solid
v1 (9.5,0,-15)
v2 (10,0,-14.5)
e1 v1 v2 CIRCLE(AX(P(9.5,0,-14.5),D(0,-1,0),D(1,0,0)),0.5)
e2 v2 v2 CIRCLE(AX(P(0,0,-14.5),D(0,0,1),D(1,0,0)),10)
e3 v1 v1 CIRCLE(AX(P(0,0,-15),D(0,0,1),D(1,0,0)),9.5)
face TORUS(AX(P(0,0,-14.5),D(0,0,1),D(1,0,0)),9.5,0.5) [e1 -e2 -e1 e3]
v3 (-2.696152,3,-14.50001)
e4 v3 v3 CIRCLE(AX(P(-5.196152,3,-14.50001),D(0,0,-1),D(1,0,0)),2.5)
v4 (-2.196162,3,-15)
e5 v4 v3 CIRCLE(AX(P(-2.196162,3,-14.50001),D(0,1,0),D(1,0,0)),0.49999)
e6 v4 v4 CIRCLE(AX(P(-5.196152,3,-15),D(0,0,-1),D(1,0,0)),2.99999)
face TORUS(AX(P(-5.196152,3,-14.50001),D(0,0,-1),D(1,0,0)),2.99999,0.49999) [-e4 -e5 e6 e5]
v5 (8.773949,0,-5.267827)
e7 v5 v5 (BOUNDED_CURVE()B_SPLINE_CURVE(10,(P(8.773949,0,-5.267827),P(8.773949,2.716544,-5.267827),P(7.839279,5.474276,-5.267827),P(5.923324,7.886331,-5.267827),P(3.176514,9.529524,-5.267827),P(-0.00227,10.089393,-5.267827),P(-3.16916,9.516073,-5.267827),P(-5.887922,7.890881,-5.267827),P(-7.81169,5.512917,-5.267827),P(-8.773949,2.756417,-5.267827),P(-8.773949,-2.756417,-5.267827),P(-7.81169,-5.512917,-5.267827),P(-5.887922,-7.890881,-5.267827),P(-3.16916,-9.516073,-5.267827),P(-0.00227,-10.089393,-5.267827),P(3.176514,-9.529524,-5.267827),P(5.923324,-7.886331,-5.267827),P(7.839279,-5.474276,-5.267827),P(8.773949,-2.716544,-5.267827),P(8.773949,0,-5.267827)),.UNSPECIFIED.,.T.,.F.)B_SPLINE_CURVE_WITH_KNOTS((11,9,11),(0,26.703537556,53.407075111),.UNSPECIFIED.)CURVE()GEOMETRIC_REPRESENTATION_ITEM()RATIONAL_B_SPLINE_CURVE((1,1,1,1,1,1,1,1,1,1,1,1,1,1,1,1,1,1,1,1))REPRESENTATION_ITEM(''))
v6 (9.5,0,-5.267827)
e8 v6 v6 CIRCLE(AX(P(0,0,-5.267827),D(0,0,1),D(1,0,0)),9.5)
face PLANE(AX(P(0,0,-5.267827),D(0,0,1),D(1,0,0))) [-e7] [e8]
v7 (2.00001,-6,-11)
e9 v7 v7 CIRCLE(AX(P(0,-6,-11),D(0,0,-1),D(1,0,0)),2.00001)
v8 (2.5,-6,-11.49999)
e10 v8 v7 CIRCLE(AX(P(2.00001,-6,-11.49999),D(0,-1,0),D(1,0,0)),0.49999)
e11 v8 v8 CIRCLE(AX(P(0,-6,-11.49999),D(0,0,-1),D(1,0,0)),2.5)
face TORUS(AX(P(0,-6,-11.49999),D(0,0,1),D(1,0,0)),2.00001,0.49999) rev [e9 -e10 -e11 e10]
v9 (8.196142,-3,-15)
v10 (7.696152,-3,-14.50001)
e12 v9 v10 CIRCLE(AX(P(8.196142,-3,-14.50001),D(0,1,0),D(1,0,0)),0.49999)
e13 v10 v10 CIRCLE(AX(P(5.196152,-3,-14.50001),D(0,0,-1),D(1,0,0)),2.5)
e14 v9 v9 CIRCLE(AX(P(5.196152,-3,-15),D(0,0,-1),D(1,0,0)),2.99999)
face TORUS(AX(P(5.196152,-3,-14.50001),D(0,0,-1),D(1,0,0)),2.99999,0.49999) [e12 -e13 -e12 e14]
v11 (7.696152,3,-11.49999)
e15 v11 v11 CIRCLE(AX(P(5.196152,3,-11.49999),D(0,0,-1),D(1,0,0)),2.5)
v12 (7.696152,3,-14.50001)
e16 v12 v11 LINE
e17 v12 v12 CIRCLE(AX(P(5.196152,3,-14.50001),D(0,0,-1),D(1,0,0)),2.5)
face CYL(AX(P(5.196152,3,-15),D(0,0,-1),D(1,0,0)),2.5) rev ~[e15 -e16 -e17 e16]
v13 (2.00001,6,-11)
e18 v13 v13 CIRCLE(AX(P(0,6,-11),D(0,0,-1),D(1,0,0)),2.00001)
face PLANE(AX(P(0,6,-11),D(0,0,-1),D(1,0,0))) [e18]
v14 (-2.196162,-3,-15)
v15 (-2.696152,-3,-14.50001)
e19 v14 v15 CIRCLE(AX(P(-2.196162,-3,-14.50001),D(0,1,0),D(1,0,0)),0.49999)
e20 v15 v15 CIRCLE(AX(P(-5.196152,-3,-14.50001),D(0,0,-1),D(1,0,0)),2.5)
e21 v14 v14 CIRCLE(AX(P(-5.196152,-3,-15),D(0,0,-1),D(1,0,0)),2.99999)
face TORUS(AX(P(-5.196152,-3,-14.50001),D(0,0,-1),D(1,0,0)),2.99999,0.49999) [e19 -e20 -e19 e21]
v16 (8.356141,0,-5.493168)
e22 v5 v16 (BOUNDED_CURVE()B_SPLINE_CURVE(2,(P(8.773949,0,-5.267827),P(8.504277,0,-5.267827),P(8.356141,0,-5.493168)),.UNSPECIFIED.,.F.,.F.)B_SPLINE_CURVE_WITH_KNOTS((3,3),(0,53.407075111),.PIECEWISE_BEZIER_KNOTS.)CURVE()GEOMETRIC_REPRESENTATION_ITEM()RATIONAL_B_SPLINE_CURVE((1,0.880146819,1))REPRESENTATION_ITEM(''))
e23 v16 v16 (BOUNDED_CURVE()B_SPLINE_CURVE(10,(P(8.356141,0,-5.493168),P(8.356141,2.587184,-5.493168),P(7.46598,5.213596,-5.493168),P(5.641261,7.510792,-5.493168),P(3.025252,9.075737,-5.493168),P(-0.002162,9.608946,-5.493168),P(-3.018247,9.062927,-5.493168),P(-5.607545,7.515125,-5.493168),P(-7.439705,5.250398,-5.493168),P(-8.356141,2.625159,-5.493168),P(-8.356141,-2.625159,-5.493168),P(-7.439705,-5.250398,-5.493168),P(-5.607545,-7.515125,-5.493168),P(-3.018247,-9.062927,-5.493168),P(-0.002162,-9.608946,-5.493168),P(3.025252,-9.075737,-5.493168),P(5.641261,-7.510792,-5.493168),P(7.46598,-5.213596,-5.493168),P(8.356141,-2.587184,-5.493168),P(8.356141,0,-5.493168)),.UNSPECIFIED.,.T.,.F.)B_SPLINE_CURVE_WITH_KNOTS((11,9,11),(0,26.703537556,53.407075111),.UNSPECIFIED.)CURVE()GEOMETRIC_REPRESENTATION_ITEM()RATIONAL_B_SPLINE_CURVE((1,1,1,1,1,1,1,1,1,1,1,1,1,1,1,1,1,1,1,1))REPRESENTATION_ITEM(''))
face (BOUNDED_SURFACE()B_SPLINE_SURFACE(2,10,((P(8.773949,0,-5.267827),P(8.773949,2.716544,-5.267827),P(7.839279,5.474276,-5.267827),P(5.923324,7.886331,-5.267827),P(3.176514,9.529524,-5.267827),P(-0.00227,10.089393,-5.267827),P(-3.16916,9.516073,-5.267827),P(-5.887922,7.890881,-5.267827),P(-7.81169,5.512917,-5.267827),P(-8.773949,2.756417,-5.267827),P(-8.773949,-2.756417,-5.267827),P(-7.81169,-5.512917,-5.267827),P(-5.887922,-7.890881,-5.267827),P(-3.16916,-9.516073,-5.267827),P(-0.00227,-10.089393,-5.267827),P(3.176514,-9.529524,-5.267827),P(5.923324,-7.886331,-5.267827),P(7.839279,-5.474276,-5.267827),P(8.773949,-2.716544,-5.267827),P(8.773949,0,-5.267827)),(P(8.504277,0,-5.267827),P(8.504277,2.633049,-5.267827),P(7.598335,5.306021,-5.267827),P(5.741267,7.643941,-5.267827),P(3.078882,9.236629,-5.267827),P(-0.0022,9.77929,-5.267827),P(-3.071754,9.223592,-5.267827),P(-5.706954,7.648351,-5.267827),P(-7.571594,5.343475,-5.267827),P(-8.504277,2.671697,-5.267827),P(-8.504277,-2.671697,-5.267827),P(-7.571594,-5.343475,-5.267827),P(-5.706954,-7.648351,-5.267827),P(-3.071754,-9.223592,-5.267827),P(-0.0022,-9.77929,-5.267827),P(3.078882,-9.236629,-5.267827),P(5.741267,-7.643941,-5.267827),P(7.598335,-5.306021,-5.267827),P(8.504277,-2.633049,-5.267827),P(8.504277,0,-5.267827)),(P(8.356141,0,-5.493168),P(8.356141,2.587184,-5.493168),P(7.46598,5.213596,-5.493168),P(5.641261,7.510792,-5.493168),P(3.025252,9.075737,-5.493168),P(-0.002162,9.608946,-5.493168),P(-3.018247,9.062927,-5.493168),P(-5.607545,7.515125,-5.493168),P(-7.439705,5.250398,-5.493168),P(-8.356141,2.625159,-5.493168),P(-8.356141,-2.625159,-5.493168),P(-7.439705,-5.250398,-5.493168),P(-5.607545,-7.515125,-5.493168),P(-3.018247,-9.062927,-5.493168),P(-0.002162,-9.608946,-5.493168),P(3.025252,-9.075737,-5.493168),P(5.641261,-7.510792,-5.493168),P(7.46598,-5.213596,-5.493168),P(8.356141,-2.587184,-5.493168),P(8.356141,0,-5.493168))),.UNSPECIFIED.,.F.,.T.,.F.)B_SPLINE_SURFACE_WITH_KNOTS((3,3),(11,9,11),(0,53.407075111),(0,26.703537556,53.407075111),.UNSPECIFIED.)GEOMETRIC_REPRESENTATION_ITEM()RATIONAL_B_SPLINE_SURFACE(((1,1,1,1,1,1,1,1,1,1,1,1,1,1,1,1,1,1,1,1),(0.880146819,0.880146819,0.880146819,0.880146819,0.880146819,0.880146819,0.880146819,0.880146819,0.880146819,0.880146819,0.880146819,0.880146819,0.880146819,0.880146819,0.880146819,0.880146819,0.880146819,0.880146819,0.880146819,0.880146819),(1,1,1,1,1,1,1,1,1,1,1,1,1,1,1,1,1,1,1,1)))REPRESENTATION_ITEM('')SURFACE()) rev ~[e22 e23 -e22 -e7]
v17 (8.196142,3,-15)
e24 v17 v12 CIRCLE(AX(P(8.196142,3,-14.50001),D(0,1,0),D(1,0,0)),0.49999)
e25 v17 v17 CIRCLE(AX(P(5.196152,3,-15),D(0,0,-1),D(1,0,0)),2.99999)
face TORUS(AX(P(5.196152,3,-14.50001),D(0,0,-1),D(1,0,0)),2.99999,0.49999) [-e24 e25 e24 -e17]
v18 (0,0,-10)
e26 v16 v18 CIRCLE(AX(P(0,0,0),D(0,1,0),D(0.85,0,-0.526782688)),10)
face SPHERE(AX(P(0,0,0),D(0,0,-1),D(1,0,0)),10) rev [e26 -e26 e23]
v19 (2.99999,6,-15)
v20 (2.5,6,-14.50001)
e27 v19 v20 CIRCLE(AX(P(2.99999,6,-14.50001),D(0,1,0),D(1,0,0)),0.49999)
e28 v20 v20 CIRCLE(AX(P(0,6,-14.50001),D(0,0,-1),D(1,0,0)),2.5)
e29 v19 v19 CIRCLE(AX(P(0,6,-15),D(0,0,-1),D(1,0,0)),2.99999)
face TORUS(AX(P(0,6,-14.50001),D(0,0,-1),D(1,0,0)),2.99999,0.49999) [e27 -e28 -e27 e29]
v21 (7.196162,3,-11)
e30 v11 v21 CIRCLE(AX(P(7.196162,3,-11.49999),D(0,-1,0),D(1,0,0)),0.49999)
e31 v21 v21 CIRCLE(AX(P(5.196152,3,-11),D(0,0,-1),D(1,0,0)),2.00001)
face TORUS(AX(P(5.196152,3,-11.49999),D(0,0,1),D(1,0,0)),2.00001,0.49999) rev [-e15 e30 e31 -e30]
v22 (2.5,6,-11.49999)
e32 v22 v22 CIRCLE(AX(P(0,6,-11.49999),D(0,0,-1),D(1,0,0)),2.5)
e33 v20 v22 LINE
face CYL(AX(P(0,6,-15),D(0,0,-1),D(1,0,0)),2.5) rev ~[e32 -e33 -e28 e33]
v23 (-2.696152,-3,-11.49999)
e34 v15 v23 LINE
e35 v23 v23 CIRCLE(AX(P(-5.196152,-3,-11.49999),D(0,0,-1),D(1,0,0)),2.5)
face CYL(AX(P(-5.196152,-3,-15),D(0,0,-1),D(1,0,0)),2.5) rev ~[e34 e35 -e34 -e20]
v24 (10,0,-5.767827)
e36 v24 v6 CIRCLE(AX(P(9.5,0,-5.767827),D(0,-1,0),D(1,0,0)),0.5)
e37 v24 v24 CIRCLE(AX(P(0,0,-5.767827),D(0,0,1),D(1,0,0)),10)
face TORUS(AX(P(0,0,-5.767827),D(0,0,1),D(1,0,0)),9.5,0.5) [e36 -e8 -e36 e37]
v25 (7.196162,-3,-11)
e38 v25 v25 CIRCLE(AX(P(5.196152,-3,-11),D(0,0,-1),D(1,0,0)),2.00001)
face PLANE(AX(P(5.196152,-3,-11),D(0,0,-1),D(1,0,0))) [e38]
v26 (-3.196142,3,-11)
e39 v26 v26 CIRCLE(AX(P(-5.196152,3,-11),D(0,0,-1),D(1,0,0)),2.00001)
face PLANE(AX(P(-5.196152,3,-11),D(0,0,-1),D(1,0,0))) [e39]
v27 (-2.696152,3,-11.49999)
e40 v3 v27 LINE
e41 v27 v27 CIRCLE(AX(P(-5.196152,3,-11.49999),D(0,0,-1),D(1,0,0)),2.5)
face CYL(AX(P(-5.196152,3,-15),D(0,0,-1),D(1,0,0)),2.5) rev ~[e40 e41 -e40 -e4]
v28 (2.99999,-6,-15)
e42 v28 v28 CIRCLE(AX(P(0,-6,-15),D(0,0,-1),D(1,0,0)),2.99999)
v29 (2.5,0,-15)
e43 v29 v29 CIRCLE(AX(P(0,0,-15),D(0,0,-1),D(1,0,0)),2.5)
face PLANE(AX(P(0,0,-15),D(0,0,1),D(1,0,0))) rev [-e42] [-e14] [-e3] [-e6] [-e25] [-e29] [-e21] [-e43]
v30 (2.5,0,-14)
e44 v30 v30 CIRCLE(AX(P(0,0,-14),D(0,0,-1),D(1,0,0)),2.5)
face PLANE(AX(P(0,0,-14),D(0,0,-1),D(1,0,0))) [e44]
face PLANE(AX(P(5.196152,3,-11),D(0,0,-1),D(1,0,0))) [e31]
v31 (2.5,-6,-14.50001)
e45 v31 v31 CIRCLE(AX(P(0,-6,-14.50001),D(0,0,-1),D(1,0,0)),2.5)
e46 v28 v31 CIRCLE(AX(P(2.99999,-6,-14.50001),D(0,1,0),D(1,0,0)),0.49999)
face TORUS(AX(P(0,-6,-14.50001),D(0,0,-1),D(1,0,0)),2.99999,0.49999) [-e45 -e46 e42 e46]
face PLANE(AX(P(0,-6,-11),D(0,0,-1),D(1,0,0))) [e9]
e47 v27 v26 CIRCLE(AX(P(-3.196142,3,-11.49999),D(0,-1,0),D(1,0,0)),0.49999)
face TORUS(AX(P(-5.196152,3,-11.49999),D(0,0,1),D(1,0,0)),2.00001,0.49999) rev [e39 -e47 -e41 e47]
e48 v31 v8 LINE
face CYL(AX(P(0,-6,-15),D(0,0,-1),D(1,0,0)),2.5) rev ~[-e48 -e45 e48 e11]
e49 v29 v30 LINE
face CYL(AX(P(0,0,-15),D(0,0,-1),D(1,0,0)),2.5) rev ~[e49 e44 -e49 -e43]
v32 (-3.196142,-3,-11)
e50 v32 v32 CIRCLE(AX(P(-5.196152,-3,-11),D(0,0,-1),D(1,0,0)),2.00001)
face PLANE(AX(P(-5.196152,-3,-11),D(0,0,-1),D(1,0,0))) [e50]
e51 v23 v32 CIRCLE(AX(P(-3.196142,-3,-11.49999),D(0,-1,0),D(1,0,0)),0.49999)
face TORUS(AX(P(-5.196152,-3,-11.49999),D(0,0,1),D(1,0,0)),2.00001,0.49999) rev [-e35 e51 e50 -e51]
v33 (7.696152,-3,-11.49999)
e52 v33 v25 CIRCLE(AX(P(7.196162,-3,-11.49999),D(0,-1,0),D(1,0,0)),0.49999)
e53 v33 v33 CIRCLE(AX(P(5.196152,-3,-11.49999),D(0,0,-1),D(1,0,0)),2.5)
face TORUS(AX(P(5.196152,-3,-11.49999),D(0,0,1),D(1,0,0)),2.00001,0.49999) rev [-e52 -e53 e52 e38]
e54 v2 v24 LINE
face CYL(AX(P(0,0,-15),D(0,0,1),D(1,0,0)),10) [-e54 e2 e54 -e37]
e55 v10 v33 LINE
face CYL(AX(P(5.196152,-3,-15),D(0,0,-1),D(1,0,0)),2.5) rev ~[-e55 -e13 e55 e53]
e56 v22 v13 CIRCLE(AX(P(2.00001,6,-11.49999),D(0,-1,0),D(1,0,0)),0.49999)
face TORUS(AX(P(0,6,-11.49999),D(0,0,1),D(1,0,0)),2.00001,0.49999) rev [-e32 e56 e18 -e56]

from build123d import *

# Parameters (mm, degrees)
F2_R     = 2.5
F3_DEPTH = 1
F4_R     = 2.5
F5_DEPTH = 4
F6_R     = 0.49999
F7_R     = 0.5


# Not quite as in the source:
# - a fillet or chamfer is up to 0.001 mm smaller than in the source, because OpenCascade refuses the exact size


with BuildPart() as f1:
    # F0 (on Front) → F1 (revolve)
    with BuildSketch(Plane.XZ):
        with BuildLine():
            ThreePointArc((8.5, -5.2678268764), (4.8642435813, -8.7372269275), (0, -10))
            Line((0, -10), (0, -15))
            Line((0, -15), (10, -15))
            Line((10, -15), (10, -5.2678268764))
            Line((10, -5.2678268764), (8.5, -5.2678268764))
        make_face()
    revolve(axis=Axis((0, 0, -12.5), (0, 0, 1)))

    # F2 (on face) → F3 (cut)
    with BuildSketch(Plane(origin=(0, 0, -15), x_dir=(1, 0, 0), z_dir=(0, 0, -1))):
        Circle(F2_R)
    extrude(amount=-F3_DEPTH, mode=Mode.SUBTRACT)

    # F4 (on face) → F5 (cut)
    with BuildSketch(Plane(origin=(0, 0, -15), x_dir=(1, 0, 0), z_dir=(0, 0, -1))):
        with Locations((-5.1961524227, 3)):
            Circle(F4_R)
        with Locations((0, 6)):
            Circle(F4_R)
        with Locations((5.1961524227, 3)):
            Circle(F4_R)
        with Locations((5.1961524227, -3)):
            Circle(F4_R)
        with Locations((0, -6)):
            Circle(F4_R)
        with Locations((-5.1961524227, -3)):
            Circle(F4_R)
    extrude(amount=-F5_DEPTH, mode=Mode.SUBTRACT)

    # F6 (radius 0.5 in the source; OpenCascade refuses exactly that, so slightly less here)
    f6_edges = [f1.edges().sort_by_distance(p)[0] for p in [
        (2.696152, 3, -15),
        (-2.5, 6, -15),
        (-7.696152, 3, -15),
        (-7.696152, -3, -15),
        (-2.5, -6, -15),
        (2.696152, -3, -15),
        (2.696152, 3, -11),
        (-2.5, 6, -11),
        (-7.696152, 3, -11),
        (-7.696152, -3, -11),
        (-2.5, -6, -11),
        (2.696152, -3, -11),
    ]]
    fillet(f6_edges, radius=F6_R)

    # F7
    f7_edges = [f1.edges().sort_by_distance(p)[0] for p in [
        (-10, 0, -15),
        (-10, 0, -5.267827),
        (-8.5, 0, -5.267827),
    ]]
    fillet(f7_edges, radius=F7_R)


solid = f1.part
